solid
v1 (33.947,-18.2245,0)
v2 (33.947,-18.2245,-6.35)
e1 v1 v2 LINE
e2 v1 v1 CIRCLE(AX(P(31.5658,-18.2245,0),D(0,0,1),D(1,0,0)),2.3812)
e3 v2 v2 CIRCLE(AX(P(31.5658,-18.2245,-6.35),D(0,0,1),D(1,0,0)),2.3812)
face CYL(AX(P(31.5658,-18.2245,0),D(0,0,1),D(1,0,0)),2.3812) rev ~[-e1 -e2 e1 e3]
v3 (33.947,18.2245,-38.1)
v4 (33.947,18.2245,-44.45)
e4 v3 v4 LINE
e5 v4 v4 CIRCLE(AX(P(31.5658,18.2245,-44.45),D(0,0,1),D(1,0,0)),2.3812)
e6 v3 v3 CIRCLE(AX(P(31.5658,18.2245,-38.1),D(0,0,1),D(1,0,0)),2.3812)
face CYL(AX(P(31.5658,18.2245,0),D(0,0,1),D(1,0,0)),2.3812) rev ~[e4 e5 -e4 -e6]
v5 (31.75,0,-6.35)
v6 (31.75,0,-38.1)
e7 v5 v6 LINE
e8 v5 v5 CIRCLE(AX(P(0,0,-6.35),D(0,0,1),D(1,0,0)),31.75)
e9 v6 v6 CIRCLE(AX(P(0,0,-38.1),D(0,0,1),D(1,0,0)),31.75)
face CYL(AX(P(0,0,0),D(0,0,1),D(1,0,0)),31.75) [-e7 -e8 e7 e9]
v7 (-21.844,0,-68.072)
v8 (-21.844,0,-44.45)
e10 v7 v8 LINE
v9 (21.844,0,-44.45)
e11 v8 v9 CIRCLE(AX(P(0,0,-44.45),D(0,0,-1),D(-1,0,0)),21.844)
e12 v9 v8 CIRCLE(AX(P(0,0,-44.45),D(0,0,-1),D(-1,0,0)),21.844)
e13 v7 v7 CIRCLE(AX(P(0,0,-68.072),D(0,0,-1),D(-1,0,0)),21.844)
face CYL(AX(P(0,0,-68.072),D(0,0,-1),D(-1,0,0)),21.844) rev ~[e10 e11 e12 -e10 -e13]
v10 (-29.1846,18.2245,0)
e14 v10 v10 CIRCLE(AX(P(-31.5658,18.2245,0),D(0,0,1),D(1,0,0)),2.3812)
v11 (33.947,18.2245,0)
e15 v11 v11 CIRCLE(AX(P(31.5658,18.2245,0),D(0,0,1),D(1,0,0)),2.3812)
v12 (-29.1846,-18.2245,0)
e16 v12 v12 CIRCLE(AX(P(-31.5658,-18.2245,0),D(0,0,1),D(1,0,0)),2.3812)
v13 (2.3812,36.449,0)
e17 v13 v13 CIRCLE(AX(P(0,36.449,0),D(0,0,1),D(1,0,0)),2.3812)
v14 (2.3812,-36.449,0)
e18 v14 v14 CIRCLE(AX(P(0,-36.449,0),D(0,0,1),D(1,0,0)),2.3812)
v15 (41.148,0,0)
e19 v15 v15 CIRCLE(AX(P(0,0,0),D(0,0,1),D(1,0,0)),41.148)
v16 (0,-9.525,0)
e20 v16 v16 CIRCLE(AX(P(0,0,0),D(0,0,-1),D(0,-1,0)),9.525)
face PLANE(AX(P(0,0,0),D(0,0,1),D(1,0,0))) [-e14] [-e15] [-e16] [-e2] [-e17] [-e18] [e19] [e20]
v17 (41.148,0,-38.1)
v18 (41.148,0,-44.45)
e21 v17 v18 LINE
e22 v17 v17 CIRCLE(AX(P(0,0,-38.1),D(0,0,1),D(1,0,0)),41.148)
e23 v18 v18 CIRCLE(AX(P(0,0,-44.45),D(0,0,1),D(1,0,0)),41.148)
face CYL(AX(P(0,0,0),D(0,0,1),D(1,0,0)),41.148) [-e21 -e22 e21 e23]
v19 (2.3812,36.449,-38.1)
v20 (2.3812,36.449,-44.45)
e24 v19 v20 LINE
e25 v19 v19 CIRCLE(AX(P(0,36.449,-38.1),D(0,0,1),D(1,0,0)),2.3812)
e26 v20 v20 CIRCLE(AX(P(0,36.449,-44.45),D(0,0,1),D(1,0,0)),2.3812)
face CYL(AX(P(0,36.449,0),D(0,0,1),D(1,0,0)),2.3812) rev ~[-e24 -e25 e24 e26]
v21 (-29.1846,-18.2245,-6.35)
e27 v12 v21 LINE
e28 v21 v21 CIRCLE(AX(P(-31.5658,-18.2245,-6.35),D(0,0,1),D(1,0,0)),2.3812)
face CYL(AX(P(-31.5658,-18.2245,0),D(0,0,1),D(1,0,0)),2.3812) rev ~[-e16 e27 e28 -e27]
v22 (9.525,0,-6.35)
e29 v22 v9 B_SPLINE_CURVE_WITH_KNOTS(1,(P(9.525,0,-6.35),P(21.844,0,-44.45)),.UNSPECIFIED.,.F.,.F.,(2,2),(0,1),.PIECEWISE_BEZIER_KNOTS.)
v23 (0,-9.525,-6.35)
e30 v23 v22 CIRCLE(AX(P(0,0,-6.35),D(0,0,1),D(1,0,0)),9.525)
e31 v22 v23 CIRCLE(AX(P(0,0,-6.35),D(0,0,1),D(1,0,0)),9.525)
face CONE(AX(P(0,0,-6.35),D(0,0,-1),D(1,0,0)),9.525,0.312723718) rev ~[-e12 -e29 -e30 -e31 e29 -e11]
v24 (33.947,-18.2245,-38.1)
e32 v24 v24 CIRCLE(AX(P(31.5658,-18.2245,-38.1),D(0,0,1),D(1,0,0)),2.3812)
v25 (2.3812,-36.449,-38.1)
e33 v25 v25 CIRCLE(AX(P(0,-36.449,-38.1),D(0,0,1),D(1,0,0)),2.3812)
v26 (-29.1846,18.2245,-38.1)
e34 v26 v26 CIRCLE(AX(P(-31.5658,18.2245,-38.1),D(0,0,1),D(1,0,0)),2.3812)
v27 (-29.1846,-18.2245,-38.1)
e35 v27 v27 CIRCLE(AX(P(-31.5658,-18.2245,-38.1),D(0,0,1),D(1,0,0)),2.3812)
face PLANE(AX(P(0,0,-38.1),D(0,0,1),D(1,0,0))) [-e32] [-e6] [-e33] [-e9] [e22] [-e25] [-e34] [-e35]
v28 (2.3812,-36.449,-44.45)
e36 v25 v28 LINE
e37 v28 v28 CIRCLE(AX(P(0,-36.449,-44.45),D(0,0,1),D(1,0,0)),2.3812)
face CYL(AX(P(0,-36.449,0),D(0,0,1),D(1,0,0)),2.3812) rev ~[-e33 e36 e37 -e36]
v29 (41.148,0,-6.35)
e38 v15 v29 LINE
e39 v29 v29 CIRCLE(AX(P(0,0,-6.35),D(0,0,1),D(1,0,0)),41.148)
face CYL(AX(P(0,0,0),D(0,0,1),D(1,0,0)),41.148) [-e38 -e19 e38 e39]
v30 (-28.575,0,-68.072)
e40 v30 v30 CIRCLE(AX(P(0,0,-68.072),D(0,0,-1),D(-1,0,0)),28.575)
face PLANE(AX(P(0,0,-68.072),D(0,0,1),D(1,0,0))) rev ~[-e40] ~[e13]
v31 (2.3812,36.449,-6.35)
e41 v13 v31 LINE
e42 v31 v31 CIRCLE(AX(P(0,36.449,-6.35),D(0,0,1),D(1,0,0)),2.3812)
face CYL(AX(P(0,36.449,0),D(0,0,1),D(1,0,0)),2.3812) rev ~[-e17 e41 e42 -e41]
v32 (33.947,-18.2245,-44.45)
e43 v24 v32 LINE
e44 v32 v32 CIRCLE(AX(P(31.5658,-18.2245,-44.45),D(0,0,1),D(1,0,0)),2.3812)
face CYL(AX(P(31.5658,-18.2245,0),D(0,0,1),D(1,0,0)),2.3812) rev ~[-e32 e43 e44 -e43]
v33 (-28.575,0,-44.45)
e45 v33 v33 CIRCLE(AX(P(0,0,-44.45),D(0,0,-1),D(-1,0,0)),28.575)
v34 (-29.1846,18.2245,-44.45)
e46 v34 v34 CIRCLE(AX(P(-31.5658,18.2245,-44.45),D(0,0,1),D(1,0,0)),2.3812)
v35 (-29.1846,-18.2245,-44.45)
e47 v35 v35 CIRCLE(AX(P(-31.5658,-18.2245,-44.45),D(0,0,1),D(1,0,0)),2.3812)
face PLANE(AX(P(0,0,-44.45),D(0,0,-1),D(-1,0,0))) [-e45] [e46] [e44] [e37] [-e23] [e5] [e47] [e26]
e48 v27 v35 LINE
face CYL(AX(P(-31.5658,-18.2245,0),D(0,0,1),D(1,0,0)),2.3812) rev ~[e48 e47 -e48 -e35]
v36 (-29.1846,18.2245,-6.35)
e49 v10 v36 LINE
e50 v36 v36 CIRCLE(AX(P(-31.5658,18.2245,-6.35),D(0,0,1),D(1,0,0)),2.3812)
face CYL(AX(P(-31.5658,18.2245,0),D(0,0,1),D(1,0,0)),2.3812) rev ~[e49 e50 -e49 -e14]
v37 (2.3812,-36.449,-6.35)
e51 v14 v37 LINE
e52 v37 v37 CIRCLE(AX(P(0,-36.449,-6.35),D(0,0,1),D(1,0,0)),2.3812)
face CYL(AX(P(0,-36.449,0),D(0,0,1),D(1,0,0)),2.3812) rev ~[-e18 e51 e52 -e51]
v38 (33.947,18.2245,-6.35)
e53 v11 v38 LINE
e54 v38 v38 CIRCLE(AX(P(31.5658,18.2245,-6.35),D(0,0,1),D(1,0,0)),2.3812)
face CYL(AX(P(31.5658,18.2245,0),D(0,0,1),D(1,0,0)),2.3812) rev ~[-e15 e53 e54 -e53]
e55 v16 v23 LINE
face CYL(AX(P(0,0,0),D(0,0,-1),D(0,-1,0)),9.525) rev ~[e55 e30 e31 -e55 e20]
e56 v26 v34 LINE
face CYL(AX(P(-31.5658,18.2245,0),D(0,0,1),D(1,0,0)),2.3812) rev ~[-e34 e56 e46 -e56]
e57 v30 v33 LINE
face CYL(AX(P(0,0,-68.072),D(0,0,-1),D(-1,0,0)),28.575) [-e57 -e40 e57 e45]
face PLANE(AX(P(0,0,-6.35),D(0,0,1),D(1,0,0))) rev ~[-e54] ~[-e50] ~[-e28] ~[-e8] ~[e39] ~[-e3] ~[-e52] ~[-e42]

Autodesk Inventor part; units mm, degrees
ref_plane "YZ Plane" through (0, 0, 0) normal (1, 0, 0) x (0, 1, 0)
ref_plane "XZ Plane" through (0, 0, 0) normal (0, 1, 0) x (-1, 0, 0)
ref_plane "XY Plane" through (0, 0, 0) normal (0, 0, 1) x (1, 0, 0)
sketch "Sketch1" plane through (0, 0, 0) normal (0, 0, 1) x (1, 0, 0)
  circle A0 centre (0, 0) radius 41.148
  dimension "d0" = 82.296
extrude "Extrusion1" add sketch "Sketch1" against normal blind 68.072
sketch "Sketch2" plane through (0, 0, 0) normal (0, 0, 1) x (1, 0, 0)
  circle A0 centre (0, 0) radius 9.525
  dimension "d3" = 19.05
extrude "Extrusion2" cut sketch "Sketch2" against normal blind 68.072
sketch "Sketch3" plane through (0, 0, -68.072) normal (0, 0, -1) x (-1, 0, 0)
  circle A0 centre (0, 0) radius 21.844
  dimension "d6" = 43.688
extrude "Extrusion3" cut sketch "Sketch3" against normal blind 23.622
sketch "Sketch4" plane through (0, 0, 0) normal (0, 0, 1) x (1, 0, 0)
  circle A0 centre (0, 0) radius 9.525
extrude "Extrusion4" add sketch "Sketch4" against normal blind 6.35
loft "Loft1" cut section 1 edges at (-9.525, 0, -6.35) section 2 edges at (21.844, 0, -44.45)
sketch "Sketch5" plane through (0, 0, 0) normal (0, 0, 1) x (1, 0, 0)
  point P0 (0, 0)
hole "Hole1" at (0, 0, 0) direction (0, 0, -1) diameter 19.05 depth 50.419 tip angle 118
sketch "Sketch6" plane through (0, 0, 0) normal (0, 0, 1) x (1, 0, 0)
  circle A0 centre (0, 0) radius 41.148
  circle A1 centre (0, 0) radius 31.75
  dimension "d22" = 63.5
sketch "Sketch7" plane through (0, 0, -68.072) normal (0, 0, -1) x (-1, 0, 0)
  circle A0 centre (0, 0) radius 41.148
  circle A1 centre (0, 0) radius 9.525 projected
  circle A2 centre (0, 0) radius 28.575
  dimension "d23" = 57.15
extrude "Extrusion5" cut sketch "Sketch7" against normal blind 23.622 contours A0
extrude "Extrusion6" cut sketch "Sketch6" against normal blind 38.1
sketch "Sketch8" plane through (0, 0, 0) normal (0, 0, 1) x (1, 0, 0)
  circle A0 centre (0, 0) radius 31.75
  circle A1 centre (0, 0) radius 41.148
extrude "Extrusion7" add sketch "Sketch8" against normal blind 6.35
sketch "Sketch9" plane through (0, 0, 0) normal (0, 0, 1) x (1, 0, 0)
  circle A0 centre (0, 36.449) radius 2.3812
  circle A1 centre (31.5658, 18.2245) radius 2.3812
  circle A2 centre (31.5658, -18.2245) radius 2.3812
  circle A3 centre (0, -36.449) radius 2.3812
  circle A4 centre (-31.5658, -18.2245) radius 2.3812
  circle A5 centre (-31.5658, 18.2245) radius 2.3812
  point P0 (0, 0)
  dimension "d30" = 4.7625
  dimension "d33" = 360
extrude "Extrusion8" cut sketch "Sketch9" against normal blind 127
properties part number "PreCombChamber4_4"
